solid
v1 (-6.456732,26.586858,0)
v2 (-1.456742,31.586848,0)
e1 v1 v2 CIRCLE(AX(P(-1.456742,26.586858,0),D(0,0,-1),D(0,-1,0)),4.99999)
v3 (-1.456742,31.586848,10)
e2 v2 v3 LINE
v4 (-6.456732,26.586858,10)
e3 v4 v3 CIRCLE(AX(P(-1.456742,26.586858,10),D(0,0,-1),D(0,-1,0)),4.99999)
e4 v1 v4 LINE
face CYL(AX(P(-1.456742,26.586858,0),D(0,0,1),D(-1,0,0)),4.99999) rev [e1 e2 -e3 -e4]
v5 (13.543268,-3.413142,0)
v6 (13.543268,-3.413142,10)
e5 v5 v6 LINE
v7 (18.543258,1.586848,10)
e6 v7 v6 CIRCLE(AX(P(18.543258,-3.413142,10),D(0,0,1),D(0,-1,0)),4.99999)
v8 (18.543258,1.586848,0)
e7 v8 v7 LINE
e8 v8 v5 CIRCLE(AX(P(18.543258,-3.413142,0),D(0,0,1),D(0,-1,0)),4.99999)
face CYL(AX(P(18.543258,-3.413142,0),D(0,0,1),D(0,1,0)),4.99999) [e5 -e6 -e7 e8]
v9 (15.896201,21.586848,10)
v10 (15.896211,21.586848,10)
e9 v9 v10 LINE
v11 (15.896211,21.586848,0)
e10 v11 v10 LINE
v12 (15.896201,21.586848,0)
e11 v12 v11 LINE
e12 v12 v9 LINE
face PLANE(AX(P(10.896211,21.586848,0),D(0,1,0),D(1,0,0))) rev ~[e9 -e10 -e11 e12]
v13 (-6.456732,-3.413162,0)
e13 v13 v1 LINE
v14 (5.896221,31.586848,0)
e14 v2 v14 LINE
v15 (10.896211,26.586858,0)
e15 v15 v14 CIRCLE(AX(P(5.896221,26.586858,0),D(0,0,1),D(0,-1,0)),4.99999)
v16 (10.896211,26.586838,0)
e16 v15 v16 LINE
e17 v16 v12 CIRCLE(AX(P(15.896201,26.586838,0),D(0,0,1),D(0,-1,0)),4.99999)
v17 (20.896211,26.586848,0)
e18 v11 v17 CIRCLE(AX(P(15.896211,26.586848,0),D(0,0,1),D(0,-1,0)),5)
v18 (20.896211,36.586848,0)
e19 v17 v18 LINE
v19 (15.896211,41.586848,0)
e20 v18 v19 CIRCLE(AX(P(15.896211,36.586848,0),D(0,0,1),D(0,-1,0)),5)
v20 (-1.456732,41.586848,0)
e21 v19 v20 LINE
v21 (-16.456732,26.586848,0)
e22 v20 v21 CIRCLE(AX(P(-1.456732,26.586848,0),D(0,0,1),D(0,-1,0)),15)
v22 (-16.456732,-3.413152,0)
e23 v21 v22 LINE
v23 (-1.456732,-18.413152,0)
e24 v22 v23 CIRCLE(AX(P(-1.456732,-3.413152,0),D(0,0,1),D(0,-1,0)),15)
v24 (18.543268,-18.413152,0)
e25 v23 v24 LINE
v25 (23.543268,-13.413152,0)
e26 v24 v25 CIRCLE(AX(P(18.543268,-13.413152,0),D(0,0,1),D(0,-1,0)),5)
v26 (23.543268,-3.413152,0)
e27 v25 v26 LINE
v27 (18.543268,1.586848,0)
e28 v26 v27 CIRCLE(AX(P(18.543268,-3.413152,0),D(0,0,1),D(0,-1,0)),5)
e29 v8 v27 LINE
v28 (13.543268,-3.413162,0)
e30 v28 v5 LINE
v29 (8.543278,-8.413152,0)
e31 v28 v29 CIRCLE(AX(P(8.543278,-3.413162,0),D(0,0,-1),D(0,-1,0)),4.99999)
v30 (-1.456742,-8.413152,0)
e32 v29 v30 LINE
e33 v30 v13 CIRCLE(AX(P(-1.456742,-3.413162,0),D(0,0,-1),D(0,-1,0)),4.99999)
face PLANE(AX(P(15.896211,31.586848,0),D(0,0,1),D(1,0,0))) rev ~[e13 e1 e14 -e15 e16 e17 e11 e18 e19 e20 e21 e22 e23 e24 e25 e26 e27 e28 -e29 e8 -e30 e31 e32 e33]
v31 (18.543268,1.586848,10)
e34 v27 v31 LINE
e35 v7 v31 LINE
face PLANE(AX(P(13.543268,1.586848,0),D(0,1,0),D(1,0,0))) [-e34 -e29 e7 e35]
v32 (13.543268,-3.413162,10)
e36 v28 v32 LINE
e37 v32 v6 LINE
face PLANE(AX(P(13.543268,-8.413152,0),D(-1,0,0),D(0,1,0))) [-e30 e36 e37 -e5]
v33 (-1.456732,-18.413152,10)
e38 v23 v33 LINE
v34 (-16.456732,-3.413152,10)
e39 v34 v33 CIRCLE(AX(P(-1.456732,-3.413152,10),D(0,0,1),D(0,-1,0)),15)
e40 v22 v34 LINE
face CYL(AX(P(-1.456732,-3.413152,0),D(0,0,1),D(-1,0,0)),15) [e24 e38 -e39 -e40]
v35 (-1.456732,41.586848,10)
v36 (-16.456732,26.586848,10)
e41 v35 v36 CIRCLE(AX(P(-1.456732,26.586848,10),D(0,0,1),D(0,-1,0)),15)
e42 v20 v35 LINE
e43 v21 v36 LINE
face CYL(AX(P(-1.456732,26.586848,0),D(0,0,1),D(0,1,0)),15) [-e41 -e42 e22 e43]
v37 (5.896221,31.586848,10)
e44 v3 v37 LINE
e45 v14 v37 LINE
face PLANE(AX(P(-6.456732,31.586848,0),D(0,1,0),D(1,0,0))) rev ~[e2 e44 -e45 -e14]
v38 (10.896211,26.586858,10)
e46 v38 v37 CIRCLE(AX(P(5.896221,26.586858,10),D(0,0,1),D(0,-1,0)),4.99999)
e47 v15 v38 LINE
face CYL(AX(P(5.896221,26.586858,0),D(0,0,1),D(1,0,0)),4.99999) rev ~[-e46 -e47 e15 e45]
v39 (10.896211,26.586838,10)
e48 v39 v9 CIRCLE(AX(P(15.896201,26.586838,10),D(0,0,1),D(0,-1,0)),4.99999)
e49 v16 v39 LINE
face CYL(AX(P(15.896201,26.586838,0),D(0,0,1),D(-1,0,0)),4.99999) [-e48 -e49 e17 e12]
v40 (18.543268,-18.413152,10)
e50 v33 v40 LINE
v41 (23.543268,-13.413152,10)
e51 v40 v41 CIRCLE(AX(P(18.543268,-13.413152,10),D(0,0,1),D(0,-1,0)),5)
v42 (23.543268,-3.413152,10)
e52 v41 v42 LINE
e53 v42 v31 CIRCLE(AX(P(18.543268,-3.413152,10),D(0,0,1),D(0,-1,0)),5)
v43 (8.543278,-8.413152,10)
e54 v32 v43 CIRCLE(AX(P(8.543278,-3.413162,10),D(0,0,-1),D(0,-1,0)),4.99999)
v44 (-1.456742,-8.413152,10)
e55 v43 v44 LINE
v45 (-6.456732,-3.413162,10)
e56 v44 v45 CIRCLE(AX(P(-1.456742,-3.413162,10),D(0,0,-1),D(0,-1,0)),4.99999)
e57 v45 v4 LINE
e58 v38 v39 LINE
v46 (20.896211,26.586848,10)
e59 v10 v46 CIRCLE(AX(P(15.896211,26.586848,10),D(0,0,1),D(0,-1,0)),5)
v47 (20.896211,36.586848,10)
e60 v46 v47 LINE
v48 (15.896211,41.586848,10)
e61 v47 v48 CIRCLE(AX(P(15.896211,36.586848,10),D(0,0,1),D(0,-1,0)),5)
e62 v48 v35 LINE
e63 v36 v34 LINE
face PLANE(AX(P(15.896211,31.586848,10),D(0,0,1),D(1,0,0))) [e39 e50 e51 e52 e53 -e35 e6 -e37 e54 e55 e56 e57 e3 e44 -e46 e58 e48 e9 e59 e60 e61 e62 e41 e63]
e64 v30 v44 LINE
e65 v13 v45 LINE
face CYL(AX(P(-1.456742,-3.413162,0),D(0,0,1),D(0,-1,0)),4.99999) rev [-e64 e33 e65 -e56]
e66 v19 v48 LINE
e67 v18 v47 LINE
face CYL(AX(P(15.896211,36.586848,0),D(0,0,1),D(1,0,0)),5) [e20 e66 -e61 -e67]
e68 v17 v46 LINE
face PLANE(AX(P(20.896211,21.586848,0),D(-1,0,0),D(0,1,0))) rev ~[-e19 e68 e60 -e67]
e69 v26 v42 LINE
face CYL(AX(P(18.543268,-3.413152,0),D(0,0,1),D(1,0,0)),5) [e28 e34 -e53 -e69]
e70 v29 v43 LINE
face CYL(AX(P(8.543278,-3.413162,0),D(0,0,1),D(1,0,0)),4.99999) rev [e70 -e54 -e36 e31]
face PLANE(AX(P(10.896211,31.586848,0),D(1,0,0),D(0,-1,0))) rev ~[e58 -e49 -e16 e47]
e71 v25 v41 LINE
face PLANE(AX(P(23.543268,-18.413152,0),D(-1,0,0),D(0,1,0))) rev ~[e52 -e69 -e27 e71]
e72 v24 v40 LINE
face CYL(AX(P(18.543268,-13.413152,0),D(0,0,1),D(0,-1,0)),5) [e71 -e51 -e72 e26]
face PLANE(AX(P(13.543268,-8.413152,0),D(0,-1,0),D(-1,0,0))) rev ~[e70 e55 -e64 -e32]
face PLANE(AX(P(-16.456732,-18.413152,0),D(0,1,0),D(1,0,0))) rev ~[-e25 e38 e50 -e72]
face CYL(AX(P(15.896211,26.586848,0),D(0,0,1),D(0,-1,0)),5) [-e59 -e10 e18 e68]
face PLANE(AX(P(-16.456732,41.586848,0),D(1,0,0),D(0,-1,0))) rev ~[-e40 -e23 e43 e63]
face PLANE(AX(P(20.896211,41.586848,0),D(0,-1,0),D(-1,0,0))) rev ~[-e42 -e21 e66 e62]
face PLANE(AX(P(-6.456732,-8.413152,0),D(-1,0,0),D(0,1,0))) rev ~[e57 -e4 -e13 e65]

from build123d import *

# Parameters (mm, degrees)
F0_W     = 10
F0_H     = 10
F1_DEPTH = 10
F2_R     = 4.99999
F3_R     = 5
F4_R     = 5
F5_R     = 15


# Not quite as in the source:
# - a fillet or chamfer is up to 0.001 mm smaller than in the source, because OpenCascade refuses the exact size


with BuildPart() as f1:
    # F0 (on Top) → F1 (new body)
    with BuildSketch(Plane.XY):
        Polygon((10.8962109051, 41.5868479488), (10.8962109051, 31.5868479488), (10.8962109051, 21.5868479488), (20.8962109051, 21.5868479488), (20.8962109051, 41.5868479488), align=None)
        Polygon((-16.4567323537, 41.5868479488), (-16.4567323537, 31.5868479488), (-6.4567323537, 31.5868479488), (10.8962109051, 31.5868479488), (10.8962109051, 41.5868479488), align=None)
        Polygon((-6.4567323537, 31.5868479488), (-16.4567323537, 31.5868479488), (-16.4567323537, -18.4131520512), (-6.4567323537, -18.4131520512), (-6.4567323537, -8.4131520512), align=None)
        Polygon((13.5432676463, -8.4131520512), (-6.4567323537, -8.4131520512), (-6.4567323537, -18.4131520512), (23.5432676463, -18.4131520512), (23.5432676463, -8.4131520512), align=None)
        with Locations((18.5432676463, -3.4131520512)):
            Rectangle(F0_W, F0_H)
    extrude(amount=F1_DEPTH)

    # F2 (radius 5 in the source; OpenCascade refuses exactly that, so slightly less here)
    f2_edges = [f1.edges().sort_by_distance(p)[0] for p in [
        (13.543268, 1.586848, 5),
        (10.896211, 21.586848, 5),
        (10.896211, 31.586848, 5),
        (-6.456732, 31.586848, 5),
        (-6.456732, -8.413152, 5),
        (13.543268, -8.413152, 5),
    ]]
    fillet(f2_edges, radius=F2_R)

    # F3
    f3_edges = [f1.edges().sort_by_distance(p)[0] for p in [
        (23.543268, 1.586848, 5),
        (20.896211, 21.586848, 5),
    ]]
    fillet(f3_edges, radius=F3_R)

    # F4
    f4_edges = [f1.edges().sort_by_distance(p)[0] for p in [
        (23.543268, -18.413152, 5),
        (20.896211, 41.586848, 5),
    ]]
    fillet(f4_edges, radius=F4_R)

    # F5
    f5_edges = [f1.edges().sort_by_distance(p)[0] for p in [
        (-16.456732, -18.413152, 5),
        (-16.456732, 41.586848, 5),
    ]]
    fillet(f5_edges, radius=F5_R)


solid = f1.part
